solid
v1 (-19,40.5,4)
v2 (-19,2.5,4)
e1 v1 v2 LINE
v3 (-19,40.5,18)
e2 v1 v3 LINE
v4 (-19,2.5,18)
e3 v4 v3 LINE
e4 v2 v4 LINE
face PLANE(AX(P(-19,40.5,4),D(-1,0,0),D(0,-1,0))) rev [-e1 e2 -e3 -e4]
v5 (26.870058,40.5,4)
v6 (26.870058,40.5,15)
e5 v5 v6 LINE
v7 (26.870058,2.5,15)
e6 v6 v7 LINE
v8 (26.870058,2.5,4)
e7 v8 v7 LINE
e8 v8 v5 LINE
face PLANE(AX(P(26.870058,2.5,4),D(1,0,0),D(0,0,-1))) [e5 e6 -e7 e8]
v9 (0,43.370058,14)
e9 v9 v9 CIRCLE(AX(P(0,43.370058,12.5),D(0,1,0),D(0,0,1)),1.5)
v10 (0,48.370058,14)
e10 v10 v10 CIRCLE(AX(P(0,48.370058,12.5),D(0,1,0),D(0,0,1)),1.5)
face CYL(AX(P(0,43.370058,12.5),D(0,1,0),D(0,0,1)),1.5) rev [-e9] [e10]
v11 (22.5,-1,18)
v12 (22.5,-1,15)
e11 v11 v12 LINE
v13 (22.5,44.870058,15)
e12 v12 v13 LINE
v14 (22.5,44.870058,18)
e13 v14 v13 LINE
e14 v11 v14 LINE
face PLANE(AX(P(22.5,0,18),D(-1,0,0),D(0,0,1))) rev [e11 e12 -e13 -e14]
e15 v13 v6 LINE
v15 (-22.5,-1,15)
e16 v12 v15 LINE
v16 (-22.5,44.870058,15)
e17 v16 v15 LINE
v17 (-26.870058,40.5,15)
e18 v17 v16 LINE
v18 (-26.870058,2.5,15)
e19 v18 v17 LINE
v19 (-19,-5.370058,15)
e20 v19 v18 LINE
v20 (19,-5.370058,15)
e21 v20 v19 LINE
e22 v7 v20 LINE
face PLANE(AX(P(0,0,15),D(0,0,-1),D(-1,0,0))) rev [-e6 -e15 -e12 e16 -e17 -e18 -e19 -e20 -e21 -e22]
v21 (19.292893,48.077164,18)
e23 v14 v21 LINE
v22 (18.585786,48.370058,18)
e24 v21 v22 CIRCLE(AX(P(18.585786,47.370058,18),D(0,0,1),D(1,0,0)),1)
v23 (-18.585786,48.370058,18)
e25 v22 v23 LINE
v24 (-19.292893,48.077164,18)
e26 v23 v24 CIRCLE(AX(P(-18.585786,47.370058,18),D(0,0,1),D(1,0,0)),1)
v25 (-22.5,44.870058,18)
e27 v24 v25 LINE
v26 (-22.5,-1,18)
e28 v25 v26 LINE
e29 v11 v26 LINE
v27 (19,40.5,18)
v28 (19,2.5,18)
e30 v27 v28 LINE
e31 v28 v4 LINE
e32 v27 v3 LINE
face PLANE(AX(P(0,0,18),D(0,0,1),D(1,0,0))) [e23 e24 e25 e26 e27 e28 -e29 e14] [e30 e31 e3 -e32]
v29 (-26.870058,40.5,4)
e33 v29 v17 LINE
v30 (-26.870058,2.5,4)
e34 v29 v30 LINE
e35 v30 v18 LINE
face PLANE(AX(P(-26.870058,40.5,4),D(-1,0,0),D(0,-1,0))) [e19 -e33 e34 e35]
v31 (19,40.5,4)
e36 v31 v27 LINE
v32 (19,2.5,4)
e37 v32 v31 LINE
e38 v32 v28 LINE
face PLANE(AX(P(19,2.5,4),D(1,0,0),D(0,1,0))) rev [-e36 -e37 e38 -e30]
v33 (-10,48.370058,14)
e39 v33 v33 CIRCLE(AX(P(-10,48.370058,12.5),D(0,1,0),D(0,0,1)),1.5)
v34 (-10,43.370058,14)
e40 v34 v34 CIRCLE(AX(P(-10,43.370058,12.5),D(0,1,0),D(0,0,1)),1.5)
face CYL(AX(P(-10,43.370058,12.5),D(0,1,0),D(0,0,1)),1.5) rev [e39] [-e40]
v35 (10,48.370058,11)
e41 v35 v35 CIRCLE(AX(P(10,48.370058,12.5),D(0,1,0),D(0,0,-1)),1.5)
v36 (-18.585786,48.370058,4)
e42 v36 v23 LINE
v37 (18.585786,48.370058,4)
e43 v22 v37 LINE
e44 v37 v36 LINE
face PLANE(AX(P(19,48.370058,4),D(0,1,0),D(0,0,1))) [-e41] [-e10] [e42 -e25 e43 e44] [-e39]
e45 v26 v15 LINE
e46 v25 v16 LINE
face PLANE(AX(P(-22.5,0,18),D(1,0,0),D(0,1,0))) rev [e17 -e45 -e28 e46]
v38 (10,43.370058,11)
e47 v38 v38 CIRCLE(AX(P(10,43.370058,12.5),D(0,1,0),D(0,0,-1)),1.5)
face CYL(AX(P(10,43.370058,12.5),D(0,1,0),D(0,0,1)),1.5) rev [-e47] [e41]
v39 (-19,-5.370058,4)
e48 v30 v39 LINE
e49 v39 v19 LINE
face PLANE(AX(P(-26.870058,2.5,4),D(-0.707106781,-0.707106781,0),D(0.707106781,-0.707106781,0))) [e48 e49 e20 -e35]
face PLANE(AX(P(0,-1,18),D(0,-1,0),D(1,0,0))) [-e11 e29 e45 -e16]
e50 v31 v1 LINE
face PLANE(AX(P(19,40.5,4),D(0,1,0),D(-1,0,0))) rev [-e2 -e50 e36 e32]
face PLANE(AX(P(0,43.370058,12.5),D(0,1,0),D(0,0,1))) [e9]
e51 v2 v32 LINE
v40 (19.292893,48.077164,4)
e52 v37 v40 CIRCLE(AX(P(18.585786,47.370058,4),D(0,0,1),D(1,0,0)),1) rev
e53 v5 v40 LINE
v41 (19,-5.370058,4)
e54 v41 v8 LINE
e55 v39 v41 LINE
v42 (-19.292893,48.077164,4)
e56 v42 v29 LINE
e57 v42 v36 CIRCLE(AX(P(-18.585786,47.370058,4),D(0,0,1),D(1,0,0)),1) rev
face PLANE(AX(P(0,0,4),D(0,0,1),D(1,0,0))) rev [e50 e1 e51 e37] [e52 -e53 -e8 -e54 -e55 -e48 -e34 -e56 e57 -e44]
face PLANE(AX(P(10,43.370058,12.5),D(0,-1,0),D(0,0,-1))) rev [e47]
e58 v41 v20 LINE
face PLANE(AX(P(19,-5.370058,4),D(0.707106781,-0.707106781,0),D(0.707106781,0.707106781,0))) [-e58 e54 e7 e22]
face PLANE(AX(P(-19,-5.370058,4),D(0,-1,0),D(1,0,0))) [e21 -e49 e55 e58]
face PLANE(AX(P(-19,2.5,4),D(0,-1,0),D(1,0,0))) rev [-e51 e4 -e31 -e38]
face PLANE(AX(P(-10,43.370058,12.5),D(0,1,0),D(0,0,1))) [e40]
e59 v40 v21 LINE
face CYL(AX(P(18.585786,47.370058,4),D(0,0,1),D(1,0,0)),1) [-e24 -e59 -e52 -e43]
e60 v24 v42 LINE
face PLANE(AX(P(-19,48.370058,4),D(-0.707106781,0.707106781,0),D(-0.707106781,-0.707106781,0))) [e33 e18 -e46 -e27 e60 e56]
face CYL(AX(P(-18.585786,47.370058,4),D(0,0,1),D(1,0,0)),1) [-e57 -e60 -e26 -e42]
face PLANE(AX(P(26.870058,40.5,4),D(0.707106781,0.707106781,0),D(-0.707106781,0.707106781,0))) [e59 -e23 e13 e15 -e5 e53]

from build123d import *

# Parameters (mm, degrees)
CROQUIS3_W                   = 38
CROQUIS3_H                   = 38
SALIENTE_EXTRUIR9_DEPTH      = 1
SALIENTE_EXTRUIR10_START     = -11
SALIENTE_EXTRUIR10_OUTLINE_W = 38
SALIENTE_EXTRUIR10_OUTLINE_H = 38
SALIENTE_EXTRUIR10_DEPTH     = 10
REDONDEO3_R                  = 1
CROQUIS13_W                  = 38
CROQUIS13_H                  = 38
SALIENTE_EXTRUIR15_DEPTH     = 3
CROQUIS15_R                  = 1.5
CORTAR_EXTRUIR5_DEPTH        = 5


# Read off the part's stored shape, not the designer's step: Saliente-Extruir10
with BuildPart() as part:
    # Croquis3 → Saliente-Extruir9 (new body)
    with BuildSketch(Plane.XY.offset(5)):
        Polygon((19, -5.370057685), (26.870057685, 2.5), (26.870057685, 40.5), (19, 48.370057685), (-19, 48.370057685), (-26.870057685, 40.5), (-26.870057685, 2.5), (-19, -5.370057685), align=None)
        with Locations((0, 21.5)):
            Rectangle(CROQUIS3_W, CROQUIS3_H, mode=Mode.SUBTRACT)
    extrude(amount=-SALIENTE_EXTRUIR9_DEPTH)

    # Saliente-Extruir10 outline → Saliente-Extruir10 (add)
    with BuildSketch(Plane(origin=(0, 0, 4), x_dir=(-1, 0, 0), z_dir=(0, 0, -1)).offset(SALIENTE_EXTRUIR10_START)):
        Polygon((-26.870057685, 2.5), (-19, -5.370057685), (19, -5.370057685), (26.870057685, 2.5), (26.870057685, 40.5), (19, 48.370057685), (-19, 48.370057685), (-26.870057685, 40.5), align=None)
        with Locations((0, 21.5)):
            Rectangle(SALIENTE_EXTRUIR10_OUTLINE_W, SALIENTE_EXTRUIR10_OUTLINE_H, mode=Mode.SUBTRACT)
    extrude(amount=SALIENTE_EXTRUIR10_DEPTH)

    # Redondeo3
    redondeo3_edges = [part.edges().sort_by_distance(p)[0] for p in [
        (-19, 48.370057685, 10),
        (19, 48.370057685, 10),
    ]]
    fillet(redondeo3_edges, radius=REDONDEO3_R)

    # Croquis13 → Saliente-Extruir15 (add)
    with BuildSketch(Plane.XY.offset(15)):
        with BuildLine():
            Line((-22.5, 44.870057685), (-22.5, -1))
            Line((-22.5, -1), (22.5, -1))
            Line((22.5, -1), (22.5, 44.870057685))
            Line((22.5, 44.870057685), (19.292893219, 48.077164466))
            ThreePointArc((19.292893219, 48.077164466), (18.96846987, 48.293937218), (18.585786438, 48.370057685))
            Line((18.585786438, 48.370057685), (-18.585786438, 48.370057685))
            ThreePointArc((-18.585786438, 48.370057685), (-18.96846987, 48.293937218), (-19.292893219, 48.077164466))
            Line((-19.292893219, 48.077164466), (-22.5, 44.870057685))
        make_face()
        with Locations((0, 21.5)):
            Rectangle(CROQUIS13_W, CROQUIS13_H, mode=Mode.SUBTRACT)
    extrude(amount=SALIENTE_EXTRUIR15_DEPTH)

    # Croquis15 → Cortar-Extruir5 (cut)
    with BuildSketch(Plane(origin=(0, 48.370057685, 0), x_dir=(1, 0, 0), z_dir=(0, 1, 0))):
        with Locations(Location((0, -12.5, 0), (0, 0, 270))):
            Circle(CROQUIS15_R)
        with Locations(Location((-10, -12.5, 0), (0, 0, 270))):
            Circle(CROQUIS15_R)
        with Locations(Location((10, -12.5, 0), (0, 0, 90))):
            Circle(CROQUIS15_R)
    extrude(amount=-CORTAR_EXTRUIR5_DEPTH, mode=Mode.SUBTRACT)


solid = part.part
